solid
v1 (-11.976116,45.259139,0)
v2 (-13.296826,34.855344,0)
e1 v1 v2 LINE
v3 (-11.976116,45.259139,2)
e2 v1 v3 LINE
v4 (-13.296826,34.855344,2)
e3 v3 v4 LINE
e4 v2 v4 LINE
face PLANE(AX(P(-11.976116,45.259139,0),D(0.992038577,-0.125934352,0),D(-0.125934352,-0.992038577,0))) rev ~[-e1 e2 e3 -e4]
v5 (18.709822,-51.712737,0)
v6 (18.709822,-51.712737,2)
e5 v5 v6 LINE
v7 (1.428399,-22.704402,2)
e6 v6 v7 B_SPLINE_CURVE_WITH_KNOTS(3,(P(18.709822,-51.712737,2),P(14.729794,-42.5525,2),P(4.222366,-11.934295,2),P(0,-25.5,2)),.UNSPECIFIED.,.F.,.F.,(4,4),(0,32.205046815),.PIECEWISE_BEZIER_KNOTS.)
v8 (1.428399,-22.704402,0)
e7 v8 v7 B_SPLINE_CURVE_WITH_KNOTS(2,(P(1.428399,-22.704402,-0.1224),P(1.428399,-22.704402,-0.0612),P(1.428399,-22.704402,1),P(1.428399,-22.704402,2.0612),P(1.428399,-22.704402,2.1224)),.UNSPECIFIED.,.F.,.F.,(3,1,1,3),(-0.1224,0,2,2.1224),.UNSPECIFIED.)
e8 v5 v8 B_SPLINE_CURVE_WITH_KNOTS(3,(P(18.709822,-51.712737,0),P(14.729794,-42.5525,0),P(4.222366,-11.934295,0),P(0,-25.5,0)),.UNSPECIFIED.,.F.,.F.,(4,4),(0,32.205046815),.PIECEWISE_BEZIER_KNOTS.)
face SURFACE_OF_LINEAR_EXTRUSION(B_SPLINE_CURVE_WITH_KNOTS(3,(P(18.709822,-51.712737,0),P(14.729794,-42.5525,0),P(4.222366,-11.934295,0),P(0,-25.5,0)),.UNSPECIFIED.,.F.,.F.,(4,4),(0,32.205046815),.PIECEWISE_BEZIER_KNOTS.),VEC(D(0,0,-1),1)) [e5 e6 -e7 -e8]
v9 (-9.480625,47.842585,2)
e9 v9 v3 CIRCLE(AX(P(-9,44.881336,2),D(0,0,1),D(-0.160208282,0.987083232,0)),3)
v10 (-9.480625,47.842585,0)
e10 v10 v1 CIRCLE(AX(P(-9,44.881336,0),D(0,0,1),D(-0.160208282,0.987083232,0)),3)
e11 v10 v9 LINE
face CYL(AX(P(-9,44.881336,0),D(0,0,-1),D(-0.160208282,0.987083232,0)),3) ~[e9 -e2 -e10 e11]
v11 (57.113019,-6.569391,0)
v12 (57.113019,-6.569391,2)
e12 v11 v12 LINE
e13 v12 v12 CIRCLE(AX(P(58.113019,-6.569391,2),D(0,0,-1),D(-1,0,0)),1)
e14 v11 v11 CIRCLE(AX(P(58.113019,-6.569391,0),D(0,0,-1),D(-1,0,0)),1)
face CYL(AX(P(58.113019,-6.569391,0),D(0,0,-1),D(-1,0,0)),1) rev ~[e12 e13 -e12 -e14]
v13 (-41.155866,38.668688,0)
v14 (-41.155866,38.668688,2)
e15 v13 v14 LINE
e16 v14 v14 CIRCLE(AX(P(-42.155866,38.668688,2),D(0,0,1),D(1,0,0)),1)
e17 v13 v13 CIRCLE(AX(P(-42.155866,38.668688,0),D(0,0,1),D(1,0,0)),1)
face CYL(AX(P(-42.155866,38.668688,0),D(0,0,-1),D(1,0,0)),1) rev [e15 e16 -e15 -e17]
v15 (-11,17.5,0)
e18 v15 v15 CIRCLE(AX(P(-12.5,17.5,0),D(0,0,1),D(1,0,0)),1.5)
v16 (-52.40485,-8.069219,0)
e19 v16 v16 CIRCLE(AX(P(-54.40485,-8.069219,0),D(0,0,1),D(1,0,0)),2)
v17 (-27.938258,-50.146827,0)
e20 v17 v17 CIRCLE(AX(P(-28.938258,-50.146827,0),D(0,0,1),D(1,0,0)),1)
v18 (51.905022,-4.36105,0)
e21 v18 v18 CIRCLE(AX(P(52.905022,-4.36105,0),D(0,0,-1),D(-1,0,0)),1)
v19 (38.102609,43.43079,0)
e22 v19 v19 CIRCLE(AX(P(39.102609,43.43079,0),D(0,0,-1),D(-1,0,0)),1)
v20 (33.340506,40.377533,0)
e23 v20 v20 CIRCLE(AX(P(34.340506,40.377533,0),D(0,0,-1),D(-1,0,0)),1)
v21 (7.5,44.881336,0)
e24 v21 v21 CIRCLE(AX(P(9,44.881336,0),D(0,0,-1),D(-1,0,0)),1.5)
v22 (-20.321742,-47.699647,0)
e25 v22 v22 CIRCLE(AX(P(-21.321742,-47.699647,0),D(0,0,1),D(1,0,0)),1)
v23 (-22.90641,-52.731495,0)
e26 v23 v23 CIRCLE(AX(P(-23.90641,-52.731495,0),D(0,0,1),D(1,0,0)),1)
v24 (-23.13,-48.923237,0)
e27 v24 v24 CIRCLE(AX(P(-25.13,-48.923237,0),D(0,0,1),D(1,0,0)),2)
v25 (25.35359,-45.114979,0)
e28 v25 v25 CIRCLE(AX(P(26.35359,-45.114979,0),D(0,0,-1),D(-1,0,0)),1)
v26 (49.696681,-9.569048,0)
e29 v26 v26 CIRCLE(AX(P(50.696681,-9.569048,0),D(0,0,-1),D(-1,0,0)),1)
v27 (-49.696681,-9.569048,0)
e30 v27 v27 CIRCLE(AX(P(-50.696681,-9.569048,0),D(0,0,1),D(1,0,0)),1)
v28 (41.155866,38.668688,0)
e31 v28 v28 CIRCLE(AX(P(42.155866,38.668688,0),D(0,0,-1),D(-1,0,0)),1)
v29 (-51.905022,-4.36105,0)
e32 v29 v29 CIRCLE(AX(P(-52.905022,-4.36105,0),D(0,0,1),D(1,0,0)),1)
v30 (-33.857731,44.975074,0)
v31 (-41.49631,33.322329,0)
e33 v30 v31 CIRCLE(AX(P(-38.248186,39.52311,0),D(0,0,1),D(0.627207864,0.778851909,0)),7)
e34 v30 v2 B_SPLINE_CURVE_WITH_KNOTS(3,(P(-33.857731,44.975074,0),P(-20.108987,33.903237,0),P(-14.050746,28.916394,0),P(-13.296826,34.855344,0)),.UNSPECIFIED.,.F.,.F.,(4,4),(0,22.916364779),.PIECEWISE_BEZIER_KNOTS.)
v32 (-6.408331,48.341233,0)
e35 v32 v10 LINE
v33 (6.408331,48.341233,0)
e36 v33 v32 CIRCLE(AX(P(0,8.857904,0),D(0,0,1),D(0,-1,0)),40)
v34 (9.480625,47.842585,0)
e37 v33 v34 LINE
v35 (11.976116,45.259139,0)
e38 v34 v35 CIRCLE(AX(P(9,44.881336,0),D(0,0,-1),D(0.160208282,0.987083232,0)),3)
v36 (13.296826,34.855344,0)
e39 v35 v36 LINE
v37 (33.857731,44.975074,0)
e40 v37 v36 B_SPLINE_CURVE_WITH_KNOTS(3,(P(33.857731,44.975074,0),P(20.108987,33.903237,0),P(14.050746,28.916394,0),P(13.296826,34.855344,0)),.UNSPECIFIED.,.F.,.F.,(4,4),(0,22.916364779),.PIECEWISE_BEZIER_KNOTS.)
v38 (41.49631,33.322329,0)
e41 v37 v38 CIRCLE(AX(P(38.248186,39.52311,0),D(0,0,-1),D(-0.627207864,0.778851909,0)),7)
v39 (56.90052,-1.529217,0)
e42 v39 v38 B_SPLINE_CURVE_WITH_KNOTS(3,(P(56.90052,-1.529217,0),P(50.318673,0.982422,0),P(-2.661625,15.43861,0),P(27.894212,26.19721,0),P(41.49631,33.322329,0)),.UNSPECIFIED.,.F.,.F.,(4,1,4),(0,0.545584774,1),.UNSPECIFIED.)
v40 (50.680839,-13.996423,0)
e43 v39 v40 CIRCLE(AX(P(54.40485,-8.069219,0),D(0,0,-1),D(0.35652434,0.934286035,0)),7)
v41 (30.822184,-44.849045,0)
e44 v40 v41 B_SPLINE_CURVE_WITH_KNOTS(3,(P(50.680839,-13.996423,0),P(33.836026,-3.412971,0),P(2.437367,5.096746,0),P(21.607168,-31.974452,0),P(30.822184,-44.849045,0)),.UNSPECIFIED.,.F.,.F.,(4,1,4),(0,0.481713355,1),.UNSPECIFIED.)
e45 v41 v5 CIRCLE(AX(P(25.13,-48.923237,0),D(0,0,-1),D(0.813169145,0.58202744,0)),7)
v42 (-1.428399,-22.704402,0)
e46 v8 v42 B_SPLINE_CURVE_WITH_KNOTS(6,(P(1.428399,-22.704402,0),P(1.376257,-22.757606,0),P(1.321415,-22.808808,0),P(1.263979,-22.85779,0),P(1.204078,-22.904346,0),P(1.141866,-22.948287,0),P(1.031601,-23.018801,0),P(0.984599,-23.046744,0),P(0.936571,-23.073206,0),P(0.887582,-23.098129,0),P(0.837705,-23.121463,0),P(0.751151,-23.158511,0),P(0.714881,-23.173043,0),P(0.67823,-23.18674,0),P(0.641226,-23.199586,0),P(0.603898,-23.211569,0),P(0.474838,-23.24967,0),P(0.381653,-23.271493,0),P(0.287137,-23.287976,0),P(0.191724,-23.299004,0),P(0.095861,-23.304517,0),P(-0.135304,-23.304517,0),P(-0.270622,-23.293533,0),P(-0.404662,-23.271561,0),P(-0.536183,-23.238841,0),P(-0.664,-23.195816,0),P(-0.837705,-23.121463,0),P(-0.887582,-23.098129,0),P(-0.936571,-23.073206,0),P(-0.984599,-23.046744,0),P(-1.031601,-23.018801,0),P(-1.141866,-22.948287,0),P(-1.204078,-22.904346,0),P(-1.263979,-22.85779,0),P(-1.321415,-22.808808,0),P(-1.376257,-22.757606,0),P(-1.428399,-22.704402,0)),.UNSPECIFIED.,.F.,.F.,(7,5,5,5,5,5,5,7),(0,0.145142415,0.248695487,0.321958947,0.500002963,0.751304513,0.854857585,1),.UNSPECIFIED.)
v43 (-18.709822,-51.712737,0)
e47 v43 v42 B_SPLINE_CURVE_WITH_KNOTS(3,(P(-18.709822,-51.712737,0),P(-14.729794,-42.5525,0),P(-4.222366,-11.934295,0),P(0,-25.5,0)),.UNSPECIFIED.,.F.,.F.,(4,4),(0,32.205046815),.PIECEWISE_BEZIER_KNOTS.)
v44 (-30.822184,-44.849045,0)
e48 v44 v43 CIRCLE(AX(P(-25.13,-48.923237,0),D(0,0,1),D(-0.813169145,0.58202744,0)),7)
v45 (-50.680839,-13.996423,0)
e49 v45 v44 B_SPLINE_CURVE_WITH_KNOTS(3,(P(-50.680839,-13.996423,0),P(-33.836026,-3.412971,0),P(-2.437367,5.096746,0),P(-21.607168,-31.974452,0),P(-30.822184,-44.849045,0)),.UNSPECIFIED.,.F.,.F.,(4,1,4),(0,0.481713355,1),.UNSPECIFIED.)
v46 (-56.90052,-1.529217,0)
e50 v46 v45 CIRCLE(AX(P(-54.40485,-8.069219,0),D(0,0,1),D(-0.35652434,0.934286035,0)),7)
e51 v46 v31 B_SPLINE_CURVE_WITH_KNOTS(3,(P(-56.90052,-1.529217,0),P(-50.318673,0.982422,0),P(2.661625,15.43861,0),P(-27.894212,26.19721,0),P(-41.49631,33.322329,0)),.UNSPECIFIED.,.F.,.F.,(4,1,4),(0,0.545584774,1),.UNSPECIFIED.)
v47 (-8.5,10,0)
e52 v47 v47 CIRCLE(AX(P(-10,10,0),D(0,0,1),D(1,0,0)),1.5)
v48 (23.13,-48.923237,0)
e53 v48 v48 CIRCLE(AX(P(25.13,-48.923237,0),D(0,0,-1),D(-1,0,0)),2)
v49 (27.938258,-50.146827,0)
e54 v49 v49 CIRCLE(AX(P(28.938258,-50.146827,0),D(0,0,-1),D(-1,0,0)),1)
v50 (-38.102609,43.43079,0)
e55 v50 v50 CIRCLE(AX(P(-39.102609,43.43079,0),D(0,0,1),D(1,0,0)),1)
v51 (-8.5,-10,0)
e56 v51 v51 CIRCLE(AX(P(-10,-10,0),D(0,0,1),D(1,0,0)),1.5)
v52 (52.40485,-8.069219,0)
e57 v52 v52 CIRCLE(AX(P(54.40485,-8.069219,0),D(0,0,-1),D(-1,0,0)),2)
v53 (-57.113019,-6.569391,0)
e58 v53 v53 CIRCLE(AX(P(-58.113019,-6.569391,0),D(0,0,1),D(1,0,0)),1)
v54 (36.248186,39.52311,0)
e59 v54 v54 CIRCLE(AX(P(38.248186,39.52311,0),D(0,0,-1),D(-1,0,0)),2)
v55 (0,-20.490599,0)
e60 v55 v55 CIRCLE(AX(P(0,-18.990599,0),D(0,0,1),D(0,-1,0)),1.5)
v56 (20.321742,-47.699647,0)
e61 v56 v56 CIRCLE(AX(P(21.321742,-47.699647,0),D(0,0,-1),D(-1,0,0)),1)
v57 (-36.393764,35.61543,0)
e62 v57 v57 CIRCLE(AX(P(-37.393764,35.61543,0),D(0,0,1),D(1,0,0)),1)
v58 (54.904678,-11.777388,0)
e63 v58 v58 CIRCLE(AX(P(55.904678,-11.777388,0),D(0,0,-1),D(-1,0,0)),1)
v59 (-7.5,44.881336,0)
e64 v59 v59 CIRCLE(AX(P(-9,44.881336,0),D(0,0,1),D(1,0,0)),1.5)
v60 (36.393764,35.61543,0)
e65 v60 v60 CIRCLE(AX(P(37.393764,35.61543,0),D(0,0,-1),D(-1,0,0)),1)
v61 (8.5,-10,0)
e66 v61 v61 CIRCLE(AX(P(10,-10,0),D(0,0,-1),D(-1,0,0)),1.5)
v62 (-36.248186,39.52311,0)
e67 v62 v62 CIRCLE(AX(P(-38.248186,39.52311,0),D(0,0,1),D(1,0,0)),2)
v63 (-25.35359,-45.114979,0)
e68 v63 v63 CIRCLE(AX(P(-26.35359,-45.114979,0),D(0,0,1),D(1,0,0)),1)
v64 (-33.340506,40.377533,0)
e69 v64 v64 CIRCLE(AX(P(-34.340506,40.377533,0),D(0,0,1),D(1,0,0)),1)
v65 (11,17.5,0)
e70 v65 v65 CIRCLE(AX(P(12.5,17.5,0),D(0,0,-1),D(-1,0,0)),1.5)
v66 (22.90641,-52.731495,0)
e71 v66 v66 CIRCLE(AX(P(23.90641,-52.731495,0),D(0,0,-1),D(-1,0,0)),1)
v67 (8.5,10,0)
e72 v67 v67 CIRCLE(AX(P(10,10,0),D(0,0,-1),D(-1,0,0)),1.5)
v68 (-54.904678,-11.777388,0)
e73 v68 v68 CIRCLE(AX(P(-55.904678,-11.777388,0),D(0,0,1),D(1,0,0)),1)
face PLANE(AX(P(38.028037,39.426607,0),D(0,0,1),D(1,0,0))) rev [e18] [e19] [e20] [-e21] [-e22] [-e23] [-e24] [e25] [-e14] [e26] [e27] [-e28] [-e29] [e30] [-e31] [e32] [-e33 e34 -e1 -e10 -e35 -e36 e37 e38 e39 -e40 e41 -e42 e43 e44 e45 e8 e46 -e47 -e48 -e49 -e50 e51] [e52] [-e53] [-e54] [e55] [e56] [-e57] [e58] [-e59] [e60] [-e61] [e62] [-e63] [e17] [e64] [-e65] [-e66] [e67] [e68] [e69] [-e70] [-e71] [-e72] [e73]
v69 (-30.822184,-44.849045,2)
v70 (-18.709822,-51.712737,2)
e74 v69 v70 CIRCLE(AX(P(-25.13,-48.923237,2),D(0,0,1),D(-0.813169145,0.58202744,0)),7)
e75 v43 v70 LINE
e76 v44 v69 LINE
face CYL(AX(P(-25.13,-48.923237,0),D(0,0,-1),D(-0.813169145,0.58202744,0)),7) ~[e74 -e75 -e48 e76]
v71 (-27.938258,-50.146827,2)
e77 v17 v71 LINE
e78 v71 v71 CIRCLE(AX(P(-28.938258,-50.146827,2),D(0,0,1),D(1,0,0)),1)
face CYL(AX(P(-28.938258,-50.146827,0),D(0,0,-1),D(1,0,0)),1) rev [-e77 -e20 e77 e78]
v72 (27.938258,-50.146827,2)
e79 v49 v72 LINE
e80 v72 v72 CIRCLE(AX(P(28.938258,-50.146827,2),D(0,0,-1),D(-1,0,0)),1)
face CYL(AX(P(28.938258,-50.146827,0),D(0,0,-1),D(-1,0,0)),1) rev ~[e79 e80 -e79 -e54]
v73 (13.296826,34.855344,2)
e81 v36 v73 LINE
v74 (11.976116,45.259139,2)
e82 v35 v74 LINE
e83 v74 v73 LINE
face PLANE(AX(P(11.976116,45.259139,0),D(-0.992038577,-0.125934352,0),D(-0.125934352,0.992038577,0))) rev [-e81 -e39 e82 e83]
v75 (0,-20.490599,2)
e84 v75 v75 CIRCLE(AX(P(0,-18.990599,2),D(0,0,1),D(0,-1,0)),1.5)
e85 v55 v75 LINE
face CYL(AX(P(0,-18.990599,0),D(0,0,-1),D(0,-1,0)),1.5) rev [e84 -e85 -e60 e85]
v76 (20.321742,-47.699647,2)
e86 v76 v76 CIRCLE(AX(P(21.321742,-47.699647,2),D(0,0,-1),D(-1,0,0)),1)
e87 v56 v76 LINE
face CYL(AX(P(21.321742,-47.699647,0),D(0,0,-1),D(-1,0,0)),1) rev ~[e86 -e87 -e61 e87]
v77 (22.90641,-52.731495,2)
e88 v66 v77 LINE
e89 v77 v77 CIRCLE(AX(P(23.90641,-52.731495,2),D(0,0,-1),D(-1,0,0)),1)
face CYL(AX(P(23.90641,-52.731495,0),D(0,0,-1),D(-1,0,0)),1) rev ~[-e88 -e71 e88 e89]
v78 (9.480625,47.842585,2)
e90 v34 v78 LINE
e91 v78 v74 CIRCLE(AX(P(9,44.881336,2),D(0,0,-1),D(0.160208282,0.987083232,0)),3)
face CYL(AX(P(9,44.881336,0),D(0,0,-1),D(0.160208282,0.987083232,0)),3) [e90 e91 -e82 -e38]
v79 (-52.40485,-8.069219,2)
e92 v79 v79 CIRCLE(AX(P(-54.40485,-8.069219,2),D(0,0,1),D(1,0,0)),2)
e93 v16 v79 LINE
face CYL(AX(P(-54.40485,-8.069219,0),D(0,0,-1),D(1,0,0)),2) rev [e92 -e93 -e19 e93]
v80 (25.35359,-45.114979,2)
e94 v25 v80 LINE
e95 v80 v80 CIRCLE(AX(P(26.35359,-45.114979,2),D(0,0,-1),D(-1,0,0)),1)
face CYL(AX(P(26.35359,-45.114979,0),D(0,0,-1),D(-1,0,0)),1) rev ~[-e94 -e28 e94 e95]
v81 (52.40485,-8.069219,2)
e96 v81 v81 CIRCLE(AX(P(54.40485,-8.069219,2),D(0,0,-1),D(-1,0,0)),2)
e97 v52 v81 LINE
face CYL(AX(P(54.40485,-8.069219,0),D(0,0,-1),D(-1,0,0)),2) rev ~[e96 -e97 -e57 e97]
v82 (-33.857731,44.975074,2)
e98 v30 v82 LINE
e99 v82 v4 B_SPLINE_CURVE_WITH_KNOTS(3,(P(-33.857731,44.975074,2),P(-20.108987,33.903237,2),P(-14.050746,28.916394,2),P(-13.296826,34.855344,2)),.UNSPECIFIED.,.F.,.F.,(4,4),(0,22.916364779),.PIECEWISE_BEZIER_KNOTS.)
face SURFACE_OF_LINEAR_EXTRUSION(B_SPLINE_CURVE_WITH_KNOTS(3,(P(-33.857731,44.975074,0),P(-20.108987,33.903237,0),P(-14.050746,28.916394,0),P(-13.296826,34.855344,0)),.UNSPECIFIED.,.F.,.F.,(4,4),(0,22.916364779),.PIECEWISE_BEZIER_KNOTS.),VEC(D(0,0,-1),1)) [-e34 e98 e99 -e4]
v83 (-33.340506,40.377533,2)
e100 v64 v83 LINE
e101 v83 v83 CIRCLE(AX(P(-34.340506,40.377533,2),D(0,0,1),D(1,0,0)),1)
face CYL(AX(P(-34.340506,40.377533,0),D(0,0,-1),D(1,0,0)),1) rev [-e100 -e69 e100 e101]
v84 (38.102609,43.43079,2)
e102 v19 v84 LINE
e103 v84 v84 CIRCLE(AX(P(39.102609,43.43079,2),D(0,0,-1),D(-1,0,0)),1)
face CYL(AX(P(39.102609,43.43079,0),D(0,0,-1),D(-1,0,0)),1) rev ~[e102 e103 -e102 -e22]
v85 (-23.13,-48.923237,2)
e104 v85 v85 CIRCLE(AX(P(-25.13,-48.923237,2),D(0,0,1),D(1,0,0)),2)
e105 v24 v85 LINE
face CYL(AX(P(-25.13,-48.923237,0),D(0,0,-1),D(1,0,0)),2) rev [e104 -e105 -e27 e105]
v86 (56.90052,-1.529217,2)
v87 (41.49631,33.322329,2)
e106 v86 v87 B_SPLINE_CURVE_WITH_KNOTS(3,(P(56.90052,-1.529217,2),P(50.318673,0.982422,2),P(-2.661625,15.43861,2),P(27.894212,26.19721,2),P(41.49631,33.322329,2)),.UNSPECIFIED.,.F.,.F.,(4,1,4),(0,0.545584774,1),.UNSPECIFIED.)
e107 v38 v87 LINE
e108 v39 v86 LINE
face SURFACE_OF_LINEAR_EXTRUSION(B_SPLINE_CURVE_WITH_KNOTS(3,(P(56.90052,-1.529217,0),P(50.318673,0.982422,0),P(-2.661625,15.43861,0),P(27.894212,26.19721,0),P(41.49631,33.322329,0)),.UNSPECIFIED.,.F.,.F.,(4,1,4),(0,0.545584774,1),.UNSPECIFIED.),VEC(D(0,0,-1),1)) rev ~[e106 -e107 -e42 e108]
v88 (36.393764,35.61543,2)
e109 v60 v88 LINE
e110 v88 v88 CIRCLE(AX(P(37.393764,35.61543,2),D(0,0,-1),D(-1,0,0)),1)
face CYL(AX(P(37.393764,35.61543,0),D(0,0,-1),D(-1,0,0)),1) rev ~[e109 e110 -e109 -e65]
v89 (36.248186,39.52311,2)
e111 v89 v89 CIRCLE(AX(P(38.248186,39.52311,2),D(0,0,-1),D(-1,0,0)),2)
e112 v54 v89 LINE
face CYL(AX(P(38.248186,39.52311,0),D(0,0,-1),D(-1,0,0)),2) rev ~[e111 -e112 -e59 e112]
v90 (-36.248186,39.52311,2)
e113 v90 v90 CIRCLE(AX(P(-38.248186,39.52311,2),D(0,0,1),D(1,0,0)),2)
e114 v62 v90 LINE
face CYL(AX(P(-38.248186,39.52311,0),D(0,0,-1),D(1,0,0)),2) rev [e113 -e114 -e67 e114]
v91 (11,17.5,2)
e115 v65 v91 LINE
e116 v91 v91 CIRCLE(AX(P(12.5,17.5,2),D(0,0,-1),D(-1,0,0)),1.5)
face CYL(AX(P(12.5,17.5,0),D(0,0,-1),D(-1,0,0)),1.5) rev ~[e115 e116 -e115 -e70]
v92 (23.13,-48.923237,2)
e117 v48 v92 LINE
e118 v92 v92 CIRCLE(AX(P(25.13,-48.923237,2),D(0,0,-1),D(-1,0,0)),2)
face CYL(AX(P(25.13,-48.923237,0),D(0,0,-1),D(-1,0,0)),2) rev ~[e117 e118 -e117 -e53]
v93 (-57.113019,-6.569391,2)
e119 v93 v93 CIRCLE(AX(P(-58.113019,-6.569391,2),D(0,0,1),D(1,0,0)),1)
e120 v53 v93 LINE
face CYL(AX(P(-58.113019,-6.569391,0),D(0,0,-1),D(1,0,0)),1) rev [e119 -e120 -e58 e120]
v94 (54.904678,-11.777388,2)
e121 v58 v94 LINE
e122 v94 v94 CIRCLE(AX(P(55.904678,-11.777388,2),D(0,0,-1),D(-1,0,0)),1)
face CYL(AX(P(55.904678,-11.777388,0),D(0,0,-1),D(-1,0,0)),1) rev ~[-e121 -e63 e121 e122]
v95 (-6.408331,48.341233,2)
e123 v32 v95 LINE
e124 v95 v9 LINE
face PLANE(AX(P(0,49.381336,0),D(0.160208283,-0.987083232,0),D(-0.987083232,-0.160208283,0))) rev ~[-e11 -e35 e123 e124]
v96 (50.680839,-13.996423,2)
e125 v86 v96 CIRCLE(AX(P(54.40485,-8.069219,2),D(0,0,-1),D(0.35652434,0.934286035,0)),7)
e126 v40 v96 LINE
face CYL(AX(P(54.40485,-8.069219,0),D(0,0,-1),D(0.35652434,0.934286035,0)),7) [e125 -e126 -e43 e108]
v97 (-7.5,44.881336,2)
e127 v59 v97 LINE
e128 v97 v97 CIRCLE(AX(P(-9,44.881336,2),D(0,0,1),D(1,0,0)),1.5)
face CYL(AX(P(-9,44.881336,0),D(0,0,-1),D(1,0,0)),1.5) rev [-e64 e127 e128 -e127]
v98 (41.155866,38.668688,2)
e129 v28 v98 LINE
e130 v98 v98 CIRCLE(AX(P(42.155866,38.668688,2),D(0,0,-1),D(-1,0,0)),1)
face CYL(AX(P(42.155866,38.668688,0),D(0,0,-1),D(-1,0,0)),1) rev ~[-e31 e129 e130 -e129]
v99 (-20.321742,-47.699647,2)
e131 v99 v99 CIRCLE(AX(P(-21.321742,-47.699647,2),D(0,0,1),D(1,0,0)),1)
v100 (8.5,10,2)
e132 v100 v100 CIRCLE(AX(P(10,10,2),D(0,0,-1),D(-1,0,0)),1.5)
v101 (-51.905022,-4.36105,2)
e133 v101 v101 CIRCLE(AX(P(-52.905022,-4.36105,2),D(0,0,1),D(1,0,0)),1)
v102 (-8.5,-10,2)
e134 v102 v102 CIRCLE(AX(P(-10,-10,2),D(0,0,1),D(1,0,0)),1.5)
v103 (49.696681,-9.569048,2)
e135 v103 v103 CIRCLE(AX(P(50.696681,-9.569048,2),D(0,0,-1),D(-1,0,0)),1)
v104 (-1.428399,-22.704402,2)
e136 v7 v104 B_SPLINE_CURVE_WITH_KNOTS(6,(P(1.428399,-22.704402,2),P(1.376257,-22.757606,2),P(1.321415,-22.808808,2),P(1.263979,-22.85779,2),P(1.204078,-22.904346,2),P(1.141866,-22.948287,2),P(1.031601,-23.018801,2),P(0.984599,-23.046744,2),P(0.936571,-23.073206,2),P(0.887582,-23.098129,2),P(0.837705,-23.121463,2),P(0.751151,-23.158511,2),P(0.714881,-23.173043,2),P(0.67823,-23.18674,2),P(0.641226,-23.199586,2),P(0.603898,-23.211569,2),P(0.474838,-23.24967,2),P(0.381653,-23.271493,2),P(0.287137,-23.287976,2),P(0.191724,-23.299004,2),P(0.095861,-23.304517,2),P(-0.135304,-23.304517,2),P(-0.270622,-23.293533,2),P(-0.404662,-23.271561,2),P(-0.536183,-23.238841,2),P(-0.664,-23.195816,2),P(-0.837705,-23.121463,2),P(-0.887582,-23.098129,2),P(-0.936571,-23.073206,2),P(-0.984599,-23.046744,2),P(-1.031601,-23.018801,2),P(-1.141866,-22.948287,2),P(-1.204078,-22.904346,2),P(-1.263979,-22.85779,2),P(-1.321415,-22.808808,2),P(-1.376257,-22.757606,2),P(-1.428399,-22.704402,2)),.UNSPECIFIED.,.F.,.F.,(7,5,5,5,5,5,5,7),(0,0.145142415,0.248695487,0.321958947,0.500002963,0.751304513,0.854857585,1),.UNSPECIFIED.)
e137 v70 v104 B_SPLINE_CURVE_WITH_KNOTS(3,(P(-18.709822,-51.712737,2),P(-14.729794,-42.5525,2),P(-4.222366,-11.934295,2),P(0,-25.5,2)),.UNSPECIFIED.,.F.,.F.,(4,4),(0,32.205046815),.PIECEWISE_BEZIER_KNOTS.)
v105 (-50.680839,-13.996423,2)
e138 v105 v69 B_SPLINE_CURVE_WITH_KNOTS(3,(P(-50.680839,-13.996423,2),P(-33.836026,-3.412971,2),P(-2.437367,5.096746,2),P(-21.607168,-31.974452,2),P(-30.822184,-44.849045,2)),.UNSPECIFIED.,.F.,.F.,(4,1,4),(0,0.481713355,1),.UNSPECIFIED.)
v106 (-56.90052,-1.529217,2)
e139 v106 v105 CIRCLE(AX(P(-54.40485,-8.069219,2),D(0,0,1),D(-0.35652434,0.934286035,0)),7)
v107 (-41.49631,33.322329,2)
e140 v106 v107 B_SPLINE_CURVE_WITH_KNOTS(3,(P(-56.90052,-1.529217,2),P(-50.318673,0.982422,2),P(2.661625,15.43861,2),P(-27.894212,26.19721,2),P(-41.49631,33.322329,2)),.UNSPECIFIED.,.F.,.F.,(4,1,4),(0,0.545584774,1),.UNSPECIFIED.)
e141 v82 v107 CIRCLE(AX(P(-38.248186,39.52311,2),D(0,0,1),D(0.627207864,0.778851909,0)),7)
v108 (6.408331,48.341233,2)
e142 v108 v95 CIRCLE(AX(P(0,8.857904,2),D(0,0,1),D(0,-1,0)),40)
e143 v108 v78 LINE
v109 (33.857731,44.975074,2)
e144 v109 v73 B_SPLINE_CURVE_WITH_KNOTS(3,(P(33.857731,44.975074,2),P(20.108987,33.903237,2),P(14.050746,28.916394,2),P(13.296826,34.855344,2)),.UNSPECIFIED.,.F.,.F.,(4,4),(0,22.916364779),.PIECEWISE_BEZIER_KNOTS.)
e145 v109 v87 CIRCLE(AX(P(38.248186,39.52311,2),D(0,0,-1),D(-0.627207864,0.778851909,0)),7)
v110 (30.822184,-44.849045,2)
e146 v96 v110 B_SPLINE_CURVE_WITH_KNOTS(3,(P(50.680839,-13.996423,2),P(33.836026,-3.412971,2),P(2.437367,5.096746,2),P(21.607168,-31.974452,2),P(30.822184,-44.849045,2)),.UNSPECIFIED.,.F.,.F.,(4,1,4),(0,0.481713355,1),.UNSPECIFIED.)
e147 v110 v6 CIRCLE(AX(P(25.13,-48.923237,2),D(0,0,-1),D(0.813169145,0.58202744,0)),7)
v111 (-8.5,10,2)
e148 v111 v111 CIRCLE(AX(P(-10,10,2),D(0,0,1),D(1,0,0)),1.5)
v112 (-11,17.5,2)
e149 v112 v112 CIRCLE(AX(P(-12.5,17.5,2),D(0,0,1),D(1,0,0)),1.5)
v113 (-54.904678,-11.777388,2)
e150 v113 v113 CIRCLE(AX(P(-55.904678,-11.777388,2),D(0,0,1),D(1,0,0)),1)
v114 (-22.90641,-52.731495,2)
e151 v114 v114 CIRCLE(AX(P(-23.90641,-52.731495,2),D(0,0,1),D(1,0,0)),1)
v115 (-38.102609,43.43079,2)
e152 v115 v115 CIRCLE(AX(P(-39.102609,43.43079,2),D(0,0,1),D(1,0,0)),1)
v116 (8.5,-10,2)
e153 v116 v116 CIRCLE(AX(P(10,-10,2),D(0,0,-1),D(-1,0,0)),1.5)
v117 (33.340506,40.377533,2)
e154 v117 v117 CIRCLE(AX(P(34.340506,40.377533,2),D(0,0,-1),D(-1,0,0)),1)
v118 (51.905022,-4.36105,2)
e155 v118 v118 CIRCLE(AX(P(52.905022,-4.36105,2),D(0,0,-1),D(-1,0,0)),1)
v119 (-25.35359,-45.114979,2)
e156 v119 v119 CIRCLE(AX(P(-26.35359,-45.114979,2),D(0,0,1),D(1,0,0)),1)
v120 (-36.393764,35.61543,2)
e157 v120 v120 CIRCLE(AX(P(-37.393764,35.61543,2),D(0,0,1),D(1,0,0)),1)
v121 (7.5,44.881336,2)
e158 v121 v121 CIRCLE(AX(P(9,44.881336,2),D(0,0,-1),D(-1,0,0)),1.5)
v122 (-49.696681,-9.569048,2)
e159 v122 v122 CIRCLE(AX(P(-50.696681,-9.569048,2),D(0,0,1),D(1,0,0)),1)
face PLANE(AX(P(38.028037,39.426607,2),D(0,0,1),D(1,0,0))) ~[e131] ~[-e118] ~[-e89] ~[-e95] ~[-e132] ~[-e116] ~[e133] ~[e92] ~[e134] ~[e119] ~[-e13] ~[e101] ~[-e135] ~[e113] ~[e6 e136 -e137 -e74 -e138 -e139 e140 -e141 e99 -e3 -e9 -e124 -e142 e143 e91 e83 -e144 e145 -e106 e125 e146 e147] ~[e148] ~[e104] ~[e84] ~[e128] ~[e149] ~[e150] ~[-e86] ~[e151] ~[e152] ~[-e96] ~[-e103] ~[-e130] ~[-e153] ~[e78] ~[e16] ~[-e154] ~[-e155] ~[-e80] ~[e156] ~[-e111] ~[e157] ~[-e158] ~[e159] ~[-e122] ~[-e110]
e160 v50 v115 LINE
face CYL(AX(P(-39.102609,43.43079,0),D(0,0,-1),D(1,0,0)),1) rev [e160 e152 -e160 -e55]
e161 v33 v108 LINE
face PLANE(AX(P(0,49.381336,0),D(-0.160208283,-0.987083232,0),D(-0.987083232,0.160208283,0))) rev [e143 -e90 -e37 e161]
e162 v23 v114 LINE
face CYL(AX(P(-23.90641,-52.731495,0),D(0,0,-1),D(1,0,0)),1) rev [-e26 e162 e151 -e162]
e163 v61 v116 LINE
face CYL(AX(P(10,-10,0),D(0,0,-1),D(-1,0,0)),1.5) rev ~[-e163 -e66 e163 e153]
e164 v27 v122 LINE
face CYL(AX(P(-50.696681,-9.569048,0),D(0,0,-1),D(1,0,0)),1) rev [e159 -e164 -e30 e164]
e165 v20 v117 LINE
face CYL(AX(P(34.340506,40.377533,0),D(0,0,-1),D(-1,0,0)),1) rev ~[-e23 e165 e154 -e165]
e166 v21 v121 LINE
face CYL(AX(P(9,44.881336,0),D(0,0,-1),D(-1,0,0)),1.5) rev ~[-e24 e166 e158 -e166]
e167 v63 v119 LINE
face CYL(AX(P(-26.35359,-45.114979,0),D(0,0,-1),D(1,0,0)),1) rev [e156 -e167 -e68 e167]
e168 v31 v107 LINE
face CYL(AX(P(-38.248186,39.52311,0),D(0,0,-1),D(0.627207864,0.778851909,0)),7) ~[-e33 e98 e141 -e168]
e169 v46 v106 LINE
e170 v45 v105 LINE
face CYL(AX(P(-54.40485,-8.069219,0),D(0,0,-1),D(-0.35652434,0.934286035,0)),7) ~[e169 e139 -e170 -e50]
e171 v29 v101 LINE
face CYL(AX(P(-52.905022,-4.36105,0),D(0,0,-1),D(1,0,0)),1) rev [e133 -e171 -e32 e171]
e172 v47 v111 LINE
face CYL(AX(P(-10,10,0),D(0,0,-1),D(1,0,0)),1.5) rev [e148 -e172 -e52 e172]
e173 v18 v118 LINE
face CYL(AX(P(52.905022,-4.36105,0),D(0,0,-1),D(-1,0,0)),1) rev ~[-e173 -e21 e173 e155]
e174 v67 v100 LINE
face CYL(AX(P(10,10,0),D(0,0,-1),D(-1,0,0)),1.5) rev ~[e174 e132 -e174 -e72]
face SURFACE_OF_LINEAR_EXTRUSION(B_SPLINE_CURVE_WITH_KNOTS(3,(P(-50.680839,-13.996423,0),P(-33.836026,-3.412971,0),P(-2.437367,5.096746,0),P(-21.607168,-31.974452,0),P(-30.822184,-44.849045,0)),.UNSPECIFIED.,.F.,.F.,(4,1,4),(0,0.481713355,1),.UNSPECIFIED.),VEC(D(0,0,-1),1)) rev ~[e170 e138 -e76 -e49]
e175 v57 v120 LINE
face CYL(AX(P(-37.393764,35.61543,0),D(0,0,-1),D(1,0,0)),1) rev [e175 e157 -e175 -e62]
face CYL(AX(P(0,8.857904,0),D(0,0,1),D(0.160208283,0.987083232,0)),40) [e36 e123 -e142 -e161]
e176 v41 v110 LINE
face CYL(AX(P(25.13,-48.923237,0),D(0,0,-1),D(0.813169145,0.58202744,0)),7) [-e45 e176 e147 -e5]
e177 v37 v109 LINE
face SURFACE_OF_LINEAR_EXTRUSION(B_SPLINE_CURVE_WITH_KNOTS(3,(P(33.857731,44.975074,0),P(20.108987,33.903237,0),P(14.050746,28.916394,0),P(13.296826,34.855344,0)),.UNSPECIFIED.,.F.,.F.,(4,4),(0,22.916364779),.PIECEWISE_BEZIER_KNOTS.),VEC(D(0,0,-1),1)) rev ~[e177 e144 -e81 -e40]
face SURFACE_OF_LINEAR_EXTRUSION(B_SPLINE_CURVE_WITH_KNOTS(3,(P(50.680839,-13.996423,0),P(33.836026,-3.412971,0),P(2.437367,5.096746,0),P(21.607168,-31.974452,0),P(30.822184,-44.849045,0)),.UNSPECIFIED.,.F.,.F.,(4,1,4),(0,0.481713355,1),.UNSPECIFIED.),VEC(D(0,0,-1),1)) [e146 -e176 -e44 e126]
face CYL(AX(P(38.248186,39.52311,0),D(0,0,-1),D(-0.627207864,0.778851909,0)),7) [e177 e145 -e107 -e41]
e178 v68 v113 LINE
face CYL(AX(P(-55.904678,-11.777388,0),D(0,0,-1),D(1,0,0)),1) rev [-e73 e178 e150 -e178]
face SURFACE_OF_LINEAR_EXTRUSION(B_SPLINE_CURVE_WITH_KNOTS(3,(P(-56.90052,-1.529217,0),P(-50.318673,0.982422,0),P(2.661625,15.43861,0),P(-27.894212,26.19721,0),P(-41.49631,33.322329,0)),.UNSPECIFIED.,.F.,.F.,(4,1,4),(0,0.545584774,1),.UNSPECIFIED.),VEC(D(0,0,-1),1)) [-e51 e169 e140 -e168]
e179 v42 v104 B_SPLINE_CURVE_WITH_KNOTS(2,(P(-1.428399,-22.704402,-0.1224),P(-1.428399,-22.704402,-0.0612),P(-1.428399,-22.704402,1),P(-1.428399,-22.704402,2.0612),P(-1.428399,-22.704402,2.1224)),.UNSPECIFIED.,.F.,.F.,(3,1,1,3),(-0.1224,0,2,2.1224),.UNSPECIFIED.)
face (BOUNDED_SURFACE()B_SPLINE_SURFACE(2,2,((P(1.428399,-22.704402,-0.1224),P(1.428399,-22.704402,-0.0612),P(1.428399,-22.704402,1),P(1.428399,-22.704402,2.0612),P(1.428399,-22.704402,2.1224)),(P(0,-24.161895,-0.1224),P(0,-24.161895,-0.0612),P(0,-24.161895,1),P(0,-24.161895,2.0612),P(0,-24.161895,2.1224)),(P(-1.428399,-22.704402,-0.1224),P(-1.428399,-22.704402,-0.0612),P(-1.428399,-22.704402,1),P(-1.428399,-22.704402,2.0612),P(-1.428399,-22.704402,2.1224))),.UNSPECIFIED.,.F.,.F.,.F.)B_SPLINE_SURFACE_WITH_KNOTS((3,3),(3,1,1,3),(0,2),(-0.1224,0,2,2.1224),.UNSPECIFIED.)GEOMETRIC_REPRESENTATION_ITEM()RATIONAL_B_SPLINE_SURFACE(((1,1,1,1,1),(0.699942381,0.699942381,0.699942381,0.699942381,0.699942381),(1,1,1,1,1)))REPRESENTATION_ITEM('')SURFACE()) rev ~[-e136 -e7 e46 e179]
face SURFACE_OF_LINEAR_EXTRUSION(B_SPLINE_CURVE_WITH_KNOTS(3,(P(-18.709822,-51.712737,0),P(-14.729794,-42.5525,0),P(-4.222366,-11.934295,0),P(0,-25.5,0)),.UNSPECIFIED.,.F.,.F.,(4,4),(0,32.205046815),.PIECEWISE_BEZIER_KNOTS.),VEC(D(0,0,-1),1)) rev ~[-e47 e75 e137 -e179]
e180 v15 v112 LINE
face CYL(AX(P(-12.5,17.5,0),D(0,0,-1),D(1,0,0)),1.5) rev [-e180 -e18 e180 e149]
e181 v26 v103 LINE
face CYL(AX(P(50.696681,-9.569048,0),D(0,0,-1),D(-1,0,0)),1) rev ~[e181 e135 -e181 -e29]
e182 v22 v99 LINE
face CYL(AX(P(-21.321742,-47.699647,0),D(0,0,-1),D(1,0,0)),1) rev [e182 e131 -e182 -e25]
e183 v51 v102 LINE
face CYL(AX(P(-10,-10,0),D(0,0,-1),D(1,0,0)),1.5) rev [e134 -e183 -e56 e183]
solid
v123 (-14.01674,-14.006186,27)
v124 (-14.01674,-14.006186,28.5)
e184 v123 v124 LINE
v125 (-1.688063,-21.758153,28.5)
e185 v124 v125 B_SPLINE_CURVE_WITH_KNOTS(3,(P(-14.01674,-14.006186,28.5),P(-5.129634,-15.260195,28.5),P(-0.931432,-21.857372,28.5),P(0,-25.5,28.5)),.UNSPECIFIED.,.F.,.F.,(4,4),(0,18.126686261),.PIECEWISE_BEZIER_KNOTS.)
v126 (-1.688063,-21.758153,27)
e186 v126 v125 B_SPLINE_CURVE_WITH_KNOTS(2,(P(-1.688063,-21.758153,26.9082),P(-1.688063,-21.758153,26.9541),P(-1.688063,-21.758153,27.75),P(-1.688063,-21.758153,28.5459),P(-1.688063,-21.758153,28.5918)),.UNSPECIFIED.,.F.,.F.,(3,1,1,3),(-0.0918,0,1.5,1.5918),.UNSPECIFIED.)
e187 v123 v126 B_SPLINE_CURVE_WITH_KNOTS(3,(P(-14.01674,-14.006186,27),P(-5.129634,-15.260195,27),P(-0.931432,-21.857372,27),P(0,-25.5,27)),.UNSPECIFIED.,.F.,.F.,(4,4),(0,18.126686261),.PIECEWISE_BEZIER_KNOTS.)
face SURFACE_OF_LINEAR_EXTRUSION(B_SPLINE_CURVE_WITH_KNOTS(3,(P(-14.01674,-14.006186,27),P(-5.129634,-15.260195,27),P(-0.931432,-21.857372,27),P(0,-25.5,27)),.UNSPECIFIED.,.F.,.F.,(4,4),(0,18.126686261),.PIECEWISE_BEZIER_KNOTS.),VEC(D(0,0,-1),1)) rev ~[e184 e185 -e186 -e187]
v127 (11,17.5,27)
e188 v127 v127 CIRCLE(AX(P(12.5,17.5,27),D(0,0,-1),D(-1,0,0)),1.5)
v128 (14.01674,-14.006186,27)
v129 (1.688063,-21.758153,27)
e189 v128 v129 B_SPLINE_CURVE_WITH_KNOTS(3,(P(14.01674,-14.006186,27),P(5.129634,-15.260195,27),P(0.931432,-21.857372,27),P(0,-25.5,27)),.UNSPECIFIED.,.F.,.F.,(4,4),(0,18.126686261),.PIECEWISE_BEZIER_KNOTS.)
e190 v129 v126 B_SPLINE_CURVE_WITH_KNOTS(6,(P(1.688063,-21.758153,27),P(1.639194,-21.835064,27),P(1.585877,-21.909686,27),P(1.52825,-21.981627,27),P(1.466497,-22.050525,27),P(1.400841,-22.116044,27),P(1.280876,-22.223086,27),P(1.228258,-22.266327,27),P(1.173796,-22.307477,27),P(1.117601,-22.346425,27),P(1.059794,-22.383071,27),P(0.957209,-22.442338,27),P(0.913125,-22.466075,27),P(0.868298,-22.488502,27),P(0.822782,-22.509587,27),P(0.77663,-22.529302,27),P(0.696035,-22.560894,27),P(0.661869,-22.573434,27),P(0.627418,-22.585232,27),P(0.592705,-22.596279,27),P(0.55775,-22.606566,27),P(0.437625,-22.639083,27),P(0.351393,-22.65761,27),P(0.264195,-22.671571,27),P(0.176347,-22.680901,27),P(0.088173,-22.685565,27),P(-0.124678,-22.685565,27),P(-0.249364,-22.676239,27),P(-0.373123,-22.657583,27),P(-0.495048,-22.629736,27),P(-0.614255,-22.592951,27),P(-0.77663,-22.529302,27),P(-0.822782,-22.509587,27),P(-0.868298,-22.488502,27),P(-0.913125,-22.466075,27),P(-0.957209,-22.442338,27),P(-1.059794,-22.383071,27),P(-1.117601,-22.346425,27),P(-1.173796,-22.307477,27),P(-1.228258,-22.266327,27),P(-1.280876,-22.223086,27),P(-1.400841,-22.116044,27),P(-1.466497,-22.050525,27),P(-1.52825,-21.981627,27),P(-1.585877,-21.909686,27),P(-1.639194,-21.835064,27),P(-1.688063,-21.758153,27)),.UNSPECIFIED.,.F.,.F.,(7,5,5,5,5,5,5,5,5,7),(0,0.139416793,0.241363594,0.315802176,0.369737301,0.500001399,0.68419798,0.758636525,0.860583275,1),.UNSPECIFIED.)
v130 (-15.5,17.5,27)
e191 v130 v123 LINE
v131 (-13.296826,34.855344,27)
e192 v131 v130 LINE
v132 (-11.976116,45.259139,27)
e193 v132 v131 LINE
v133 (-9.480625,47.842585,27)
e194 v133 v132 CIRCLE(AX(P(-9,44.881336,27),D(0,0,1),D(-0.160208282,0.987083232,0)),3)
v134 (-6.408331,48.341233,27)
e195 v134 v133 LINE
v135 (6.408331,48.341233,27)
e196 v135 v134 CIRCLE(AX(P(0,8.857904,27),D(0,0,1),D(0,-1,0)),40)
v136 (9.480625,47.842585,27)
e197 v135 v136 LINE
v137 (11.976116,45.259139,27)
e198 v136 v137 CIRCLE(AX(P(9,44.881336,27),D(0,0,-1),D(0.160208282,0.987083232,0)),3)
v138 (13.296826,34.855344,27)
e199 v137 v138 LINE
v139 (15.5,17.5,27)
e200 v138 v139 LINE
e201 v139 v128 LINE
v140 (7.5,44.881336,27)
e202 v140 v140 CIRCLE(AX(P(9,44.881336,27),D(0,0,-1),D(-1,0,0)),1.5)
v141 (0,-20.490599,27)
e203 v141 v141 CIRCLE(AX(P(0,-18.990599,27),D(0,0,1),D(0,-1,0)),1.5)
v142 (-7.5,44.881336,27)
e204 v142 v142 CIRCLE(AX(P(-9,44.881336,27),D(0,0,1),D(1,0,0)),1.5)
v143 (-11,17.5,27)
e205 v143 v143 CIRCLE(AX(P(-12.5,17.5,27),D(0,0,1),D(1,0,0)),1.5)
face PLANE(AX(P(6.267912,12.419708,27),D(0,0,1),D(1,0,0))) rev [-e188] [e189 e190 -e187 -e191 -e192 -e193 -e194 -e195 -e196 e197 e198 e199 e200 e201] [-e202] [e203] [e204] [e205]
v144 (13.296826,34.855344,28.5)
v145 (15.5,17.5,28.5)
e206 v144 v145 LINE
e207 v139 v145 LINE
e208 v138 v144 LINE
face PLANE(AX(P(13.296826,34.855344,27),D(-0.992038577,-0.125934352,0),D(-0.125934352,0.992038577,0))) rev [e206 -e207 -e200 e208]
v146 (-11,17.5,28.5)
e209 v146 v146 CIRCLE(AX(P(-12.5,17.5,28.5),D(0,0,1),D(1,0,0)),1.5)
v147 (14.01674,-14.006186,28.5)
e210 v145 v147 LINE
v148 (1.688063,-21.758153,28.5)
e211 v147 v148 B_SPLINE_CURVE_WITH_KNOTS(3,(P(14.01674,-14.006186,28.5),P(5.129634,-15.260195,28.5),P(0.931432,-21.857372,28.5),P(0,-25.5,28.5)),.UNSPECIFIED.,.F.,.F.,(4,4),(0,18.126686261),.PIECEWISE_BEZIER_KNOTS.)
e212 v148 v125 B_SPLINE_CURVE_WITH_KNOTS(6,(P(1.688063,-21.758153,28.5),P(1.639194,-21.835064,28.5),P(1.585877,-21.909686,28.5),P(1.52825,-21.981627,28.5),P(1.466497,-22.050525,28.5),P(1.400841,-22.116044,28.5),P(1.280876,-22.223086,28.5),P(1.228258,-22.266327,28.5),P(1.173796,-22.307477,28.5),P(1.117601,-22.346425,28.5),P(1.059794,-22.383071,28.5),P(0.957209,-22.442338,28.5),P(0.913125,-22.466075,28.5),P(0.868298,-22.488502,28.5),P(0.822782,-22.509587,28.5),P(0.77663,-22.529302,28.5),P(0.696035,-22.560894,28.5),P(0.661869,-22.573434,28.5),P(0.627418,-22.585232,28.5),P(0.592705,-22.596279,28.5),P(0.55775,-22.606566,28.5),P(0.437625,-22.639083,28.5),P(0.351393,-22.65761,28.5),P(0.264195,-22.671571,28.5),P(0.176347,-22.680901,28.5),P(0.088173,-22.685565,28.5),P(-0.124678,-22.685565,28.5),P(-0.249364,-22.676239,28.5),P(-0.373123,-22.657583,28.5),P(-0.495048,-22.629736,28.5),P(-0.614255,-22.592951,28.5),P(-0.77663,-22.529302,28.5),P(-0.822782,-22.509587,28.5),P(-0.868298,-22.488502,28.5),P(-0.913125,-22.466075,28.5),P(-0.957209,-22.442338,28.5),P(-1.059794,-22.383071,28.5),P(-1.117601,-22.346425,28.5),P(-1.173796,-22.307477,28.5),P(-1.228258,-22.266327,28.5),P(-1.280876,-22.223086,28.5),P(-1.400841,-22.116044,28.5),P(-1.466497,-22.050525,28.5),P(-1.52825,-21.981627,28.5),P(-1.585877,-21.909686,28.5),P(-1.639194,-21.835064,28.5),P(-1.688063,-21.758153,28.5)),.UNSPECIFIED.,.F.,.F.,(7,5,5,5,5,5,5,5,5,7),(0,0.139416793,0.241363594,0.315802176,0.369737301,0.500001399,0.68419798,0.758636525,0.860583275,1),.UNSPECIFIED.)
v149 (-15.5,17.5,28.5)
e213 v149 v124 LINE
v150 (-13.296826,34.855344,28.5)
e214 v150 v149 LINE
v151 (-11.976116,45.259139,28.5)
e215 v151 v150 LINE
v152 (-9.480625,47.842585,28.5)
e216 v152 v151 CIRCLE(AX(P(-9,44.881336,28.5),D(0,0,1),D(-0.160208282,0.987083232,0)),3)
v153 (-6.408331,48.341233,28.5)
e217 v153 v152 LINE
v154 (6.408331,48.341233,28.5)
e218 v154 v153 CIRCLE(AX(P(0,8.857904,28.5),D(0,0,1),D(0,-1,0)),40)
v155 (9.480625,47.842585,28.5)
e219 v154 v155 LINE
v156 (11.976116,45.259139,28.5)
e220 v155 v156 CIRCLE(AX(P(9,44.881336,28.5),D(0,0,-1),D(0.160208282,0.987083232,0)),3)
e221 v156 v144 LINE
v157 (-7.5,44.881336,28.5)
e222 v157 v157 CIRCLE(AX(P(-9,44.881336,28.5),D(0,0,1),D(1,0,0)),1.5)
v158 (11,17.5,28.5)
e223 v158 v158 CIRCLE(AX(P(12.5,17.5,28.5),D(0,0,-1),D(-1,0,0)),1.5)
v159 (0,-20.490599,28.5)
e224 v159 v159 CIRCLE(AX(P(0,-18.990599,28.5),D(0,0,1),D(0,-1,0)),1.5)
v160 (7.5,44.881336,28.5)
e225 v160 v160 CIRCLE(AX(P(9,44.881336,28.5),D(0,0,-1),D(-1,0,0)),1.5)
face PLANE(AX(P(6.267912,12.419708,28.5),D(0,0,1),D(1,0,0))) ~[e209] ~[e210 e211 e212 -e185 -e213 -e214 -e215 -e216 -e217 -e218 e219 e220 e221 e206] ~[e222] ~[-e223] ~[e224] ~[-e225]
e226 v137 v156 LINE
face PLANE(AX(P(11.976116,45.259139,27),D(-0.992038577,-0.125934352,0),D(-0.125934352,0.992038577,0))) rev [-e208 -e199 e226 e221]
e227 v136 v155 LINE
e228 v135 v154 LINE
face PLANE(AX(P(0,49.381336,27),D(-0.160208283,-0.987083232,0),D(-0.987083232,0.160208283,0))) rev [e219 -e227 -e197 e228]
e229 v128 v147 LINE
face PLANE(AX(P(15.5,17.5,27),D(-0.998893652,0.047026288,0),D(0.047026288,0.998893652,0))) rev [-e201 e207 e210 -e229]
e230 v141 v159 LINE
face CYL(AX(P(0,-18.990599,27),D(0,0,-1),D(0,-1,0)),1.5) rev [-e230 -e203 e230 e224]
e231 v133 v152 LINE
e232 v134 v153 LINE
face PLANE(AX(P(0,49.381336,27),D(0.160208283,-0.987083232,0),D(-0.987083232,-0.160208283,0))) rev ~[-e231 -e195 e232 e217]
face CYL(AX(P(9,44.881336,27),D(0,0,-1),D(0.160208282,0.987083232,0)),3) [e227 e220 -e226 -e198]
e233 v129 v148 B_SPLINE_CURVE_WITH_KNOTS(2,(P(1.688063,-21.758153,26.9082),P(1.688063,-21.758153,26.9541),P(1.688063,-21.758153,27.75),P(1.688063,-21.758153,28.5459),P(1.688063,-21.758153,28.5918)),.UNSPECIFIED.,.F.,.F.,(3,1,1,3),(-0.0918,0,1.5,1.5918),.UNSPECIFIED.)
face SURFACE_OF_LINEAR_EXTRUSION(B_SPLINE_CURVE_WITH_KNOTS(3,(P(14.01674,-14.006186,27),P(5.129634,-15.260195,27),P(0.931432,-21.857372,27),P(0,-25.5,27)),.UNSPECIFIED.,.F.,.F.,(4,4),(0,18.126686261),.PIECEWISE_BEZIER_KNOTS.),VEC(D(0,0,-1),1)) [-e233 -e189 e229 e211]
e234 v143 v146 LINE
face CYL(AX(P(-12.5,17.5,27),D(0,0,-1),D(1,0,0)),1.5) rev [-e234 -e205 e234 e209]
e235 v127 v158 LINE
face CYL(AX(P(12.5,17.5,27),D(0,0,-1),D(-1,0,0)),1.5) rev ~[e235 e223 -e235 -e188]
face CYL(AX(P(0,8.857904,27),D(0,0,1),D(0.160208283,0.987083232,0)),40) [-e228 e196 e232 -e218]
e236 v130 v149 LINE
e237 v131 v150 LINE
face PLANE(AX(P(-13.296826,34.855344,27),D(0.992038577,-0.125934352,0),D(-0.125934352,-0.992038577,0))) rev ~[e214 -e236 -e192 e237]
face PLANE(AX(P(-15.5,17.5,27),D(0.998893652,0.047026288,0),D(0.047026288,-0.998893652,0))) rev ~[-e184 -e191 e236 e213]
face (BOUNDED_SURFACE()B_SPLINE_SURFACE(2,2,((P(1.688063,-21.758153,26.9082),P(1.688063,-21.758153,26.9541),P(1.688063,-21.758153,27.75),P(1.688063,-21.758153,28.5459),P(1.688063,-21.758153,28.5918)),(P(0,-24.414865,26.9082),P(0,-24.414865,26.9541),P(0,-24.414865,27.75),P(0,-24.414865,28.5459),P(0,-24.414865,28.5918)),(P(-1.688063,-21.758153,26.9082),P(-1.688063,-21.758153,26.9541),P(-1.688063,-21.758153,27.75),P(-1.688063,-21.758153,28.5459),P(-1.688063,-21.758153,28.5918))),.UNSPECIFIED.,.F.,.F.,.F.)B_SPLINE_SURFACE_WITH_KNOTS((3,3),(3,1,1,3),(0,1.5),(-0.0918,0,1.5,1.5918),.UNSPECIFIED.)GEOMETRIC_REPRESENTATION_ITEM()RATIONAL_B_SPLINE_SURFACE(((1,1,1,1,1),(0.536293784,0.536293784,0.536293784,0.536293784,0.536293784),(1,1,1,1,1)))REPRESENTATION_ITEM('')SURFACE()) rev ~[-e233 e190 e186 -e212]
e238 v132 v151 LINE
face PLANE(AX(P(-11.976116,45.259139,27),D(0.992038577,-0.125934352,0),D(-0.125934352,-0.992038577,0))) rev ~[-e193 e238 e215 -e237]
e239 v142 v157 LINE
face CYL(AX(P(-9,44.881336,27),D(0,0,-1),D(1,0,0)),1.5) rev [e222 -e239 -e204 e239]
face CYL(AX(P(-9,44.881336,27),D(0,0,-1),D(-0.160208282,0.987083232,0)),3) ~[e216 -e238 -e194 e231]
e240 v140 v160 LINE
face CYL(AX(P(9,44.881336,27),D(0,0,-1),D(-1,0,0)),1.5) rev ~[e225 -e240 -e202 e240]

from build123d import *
from build123d import SkipClean  # not in build123d's __all__

# Parameters (mm, degrees)
F0_R     = 1
F0_R_2   = 2
F0_R_3   = 1.5
F1_DEPTH = 2
F3_START = 27
F3_DEPTH = 1.5
F5_R     = 2
F5_2_R   = 2
F6_R     = 40
F6_2_R   = 40


with BuildPart() as f1:
    # F0 (on Top) → F1 (new body)
    with BuildSketch(Plane.XY):
        with BuildLine():
            ThreePointArc((-41.4963104591, 33.3223288889), (-34.6244361147, 33.5340840773), (-31.24818631, 39.523110252))
            ThreePointArc((-31.24818631, 39.523110252), (-31.9341865743, 42.5452630174), (-33.8577312636, 44.9750736126))
            ThreePointArc((-33.8577312636, 44.9750736126), (-44.1024877089, 43.3607078249), (-41.4963104591, 33.3223288889))
        make_face()
        with Locations((-37.3937638756, 35.6154303389)):
            Circle(F0_R, mode=Mode.SUBTRACT)
        with Locations((-42.1558662232, 38.6686878176)):
            Circle(F0_R, mode=Mode.SUBTRACT)
        with Locations((-38.24818631, 39.523110252)):
            Circle(F0_R_2, mode=Mode.SUBTRACT)
        with Locations((-39.1026087444, 43.4307901652)):
            Circle(F0_R, mode=Mode.SUBTRACT)
        with Locations((-34.3405063969, 40.3775326864)):
            Circle(F0_R, mode=Mode.SUBTRACT)
        with BuildLine():
            ThreePointArc((-47.4048499874, -8.0692191595), (-50.4343142983, -2.3042520008), (-56.9005203707, -1.5292169166))
            ThreePointArc((-56.9005203707, -1.5292169166), (-60.6686355635, -11.194117599), (-50.6808388136, -13.9964226129))
            ThreePointArc((-50.6808388136, -13.9964226129), (-48.2783469793, -11.455361639), (-47.4048499874, -8.0692191595))
        make_face()
        with Locations((-55.9046783302, -11.7773878372)):
            Circle(F0_R, mode=Mode.SUBTRACT)
        with Locations((-58.1130186652, -6.5693908168)):
            Circle(F0_R, mode=Mode.SUBTRACT)
        with Locations((-54.4048499874, -8.0692191595)):
            Circle(F0_R_2, mode=Mode.SUBTRACT)
        with Locations((-50.6966813097, -9.5690475022)):
            Circle(F0_R, mode=Mode.SUBTRACT)
        with Locations((-52.9050216447, -4.3610504818)):
            Circle(F0_R, mode=Mode.SUBTRACT)
        with BuildLine():
            ThreePointArc((-18.13, -48.9232368103), (-22.990524377, -42.2582053731), (-30.8221840168, -44.8490447286))
            ThreePointArc((-30.8221840168, -44.8490447286), (-28.5810959404, -55.0133876139), (-18.7098219402, -51.7127374251))
            ThreePointArc((-18.7098219402, -51.7127374251), (-18.2764882571, -50.3477987748), (-18.13, -48.9232368103))
        make_face()
        with Locations((-28.9382578849, -50.1468265627)):
            Circle(F0_R, mode=Mode.SUBTRACT)
        with Locations((-23.9064102476, -52.7314946952)):
            Circle(F0_R, mode=Mode.SUBTRACT)
        with Locations((-26.3535897524, -45.1149789254)):
            Circle(F0_R, mode=Mode.SUBTRACT)
        with Locations((-25.13, -48.9232368103)):
            Circle(F0_R_2, mode=Mode.SUBTRACT)
        with Locations((-21.3217421151, -47.699647058)):
            Circle(F0_R, mode=Mode.SUBTRACT)
        with BuildLine():
            ThreePointArc((-33.8577312636, 44.9750736126), (-31.9341865743, 42.5452630174), (-31.24818631, 39.523110252))
            ThreePointArc((-31.24818631, 39.523110252), (-34.6244361147, 33.5340840773), (-41.4963104591, 33.3223288889))
            add(Edge.make_bspline(
                [(-56.9005203707, -1.5292169166), (-50.3186728015, 0.9824216786), (2.6616248501, 15.4386103021), (-27.894211933, 26.1972099543), (-41.4963104591, 33.3223288889)],
                knots=[0, 0, 0, 0, 0.5455847742, 1, 1, 1, 1], degree=3))
            ThreePointArc((-56.9005203707, -1.5292169166), (-50.4343142983, -2.3042520008), (-47.4048499874, -8.0692191595))
            ThreePointArc((-47.4048499874, -8.0692191595), (-48.2783469793, -11.455361639), (-50.6808388136, -13.9964226129))
            add(Edge.make_bspline(
                [(-50.6808388136, -13.9964226129), (-33.8360257447, -3.4129708074), (-2.4373665833, 5.0967457749), (-21.6071682121, -31.974451527), (-30.8221840168, -44.8490447286)],
                knots=[0, 0, 0, 0, 0.481713355, 1, 1, 1, 1], degree=3))
            ThreePointArc((-30.8221840168, -44.8490447286), (-22.990524377, -42.2582053731), (-18.13, -48.9232368103))
            ThreePointArc((-18.13, -48.9232368103), (-18.2764882571, -50.3477987748), (-18.7098219402, -51.7127374251))
            add(Edge.make_bspline(
                [(-18.7098219402, -51.7127374251), (-14.7297938944, -42.5524997105), (-4.2223660275, -11.9342948571), (0, -25.5)],
                knots=[0, 0, 0, 0, 32.2050468149, 32.2050468149, 32.2050468149, 32.2050468149], degree=3))
            add(Edge.make_bspline(
                [(-14.0167400241, -14.0061862767), (-5.1296344027, -15.2601953596), (-0.9314316558, -21.8573715538), (0, -25.5)],
                knots=[0, 0, 0, 0, 18.1266862611, 18.1266862611, 18.1266862611, 18.1266862611], degree=3))
            Line((-14.0167400241, -14.0061862767), (-15.5, 17.5))
            Line((-15.5, 17.5), (-13.2968256499, 34.8553436253))
            add(Edge.make_bspline(
                [(-33.8577312636, 44.9750736126), (-20.1089866459, 33.9032374322), (-14.0507456444, 28.9163944135), (-13.2968256499, 34.8553436253)],
                knots=[0, 0, 0, 0, 22.9163647786, 22.9163647786, 22.9163647786, 22.9163647786], degree=3))
        make_face()
        with BuildLine():
            Line((-11.9761157322, 45.2591386998), (-13.2968256499, 34.8553436253))
            Line((-13.2968256499, 34.8553436253), (-15.5, 17.5))
            Line((-15.5, 17.5), (-14.0167400241, -14.0061862767))
            add(Edge.make_bspline(
                [(-14.0167400241, -14.0061862767), (-5.1296344027, -15.2601953596), (-0.9314316558, -21.8573715538), (0, -25.5)],
                knots=[0, 0, 0, 0, 18.1266862611, 18.1266862611, 18.1266862611, 18.1266862611], degree=3))
            Line((0, -25.5), (0, -20.490599284))
            ThreePointArc((0, -20.490599284), (-1.5, -18.990599284), (0, -17.490599284))
            Line((0, -17.490599284), (0, 49.3813356447))
            Line((0, 49.3813356447), (-9.4806248475, 47.8425853396))
            ThreePointArc((-9.4806248475, 47.8425853396), (-11.1577333, 46.9656069816), (-11.9761157322, 45.2591386998))
        make_face()
        with Locations((-10, -10)):
            Circle(F0_R_3, mode=Mode.SUBTRACT)
        with Locations((-10, 10)):
            Circle(F0_R_3, mode=Mode.SUBTRACT)
        with Locations((-12.5, 17.5)):
            Circle(F0_R_3, mode=Mode.SUBTRACT)
        with Locations((-9, 44.8813356447)):
            Circle(F0_R_3, mode=Mode.SUBTRACT)
    extrude(amount=F1_DEPTH)

    # F2: F1 across face


with BuildPart() as f1_1:
    add(f1.part, clean=False)
    with SkipClean():  # cleaning this boolean's faces spoils the solid; the shape is the same uncleaned
        add(f1.part.mirror(Plane(origin=(0, 15.9453681803, 1), x_dir=(0, 1, 0), z_dir=(1, 0, 0))), clean=False)

    # F5
    f5_edges = [f1_1.edges().sort_by_distance(p)[0] for p in [
        (0, -25.5, 1),
    ]]
    fillet(f5_edges, radius=F5_R)

    # F6
    f6_edges = [f1_1.edges().sort_by_distance(p)[0] for p in [
        (0, 49.381336, 1),
    ]]
    fillet(f6_edges, radius=F6_R)


with BuildPart() as f3:
    # F0 (on Top) → F3 (new body)
    with BuildSketch(Plane.XY.offset(F3_START)):
        with BuildLine():
            Line((-11.9761157322, 45.2591386998), (-13.2968256499, 34.8553436253))
            Line((-13.2968256499, 34.8553436253), (-15.5, 17.5))
            Line((-15.5, 17.5), (-14.0167400241, -14.0061862767))
            add(Edge.make_bspline(
                [(-14.0167400241, -14.0061862767), (-5.1296344027, -15.2601953596), (-0.9314316558, -21.8573715538), (0, -25.5)],
                knots=[0, 0, 0, 0, 18.1266862611, 18.1266862611, 18.1266862611, 18.1266862611], degree=3))
            Line((0, -25.5), (0, -20.490599284))
            ThreePointArc((0, -20.490599284), (-1.5, -18.990599284), (0, -17.490599284))
            Line((0, -17.490599284), (0, 49.3813356447))
            Line((0, 49.3813356447), (-9.4806248475, 47.8425853396))
            ThreePointArc((-9.4806248475, 47.8425853396), (-11.1577333, 46.9656069816), (-11.9761157322, 45.2591386998))
        make_face()
        with Locations((-10, -10)):
            Circle(F0_R_3, mode=Mode.SUBTRACT)
        with Locations((-10, 10)):
            Circle(F0_R_3, mode=Mode.SUBTRACT)
        with Locations((-12.5, 17.5)):
            Circle(F0_R_3, mode=Mode.SUBTRACT)
        with Locations((-9, 44.8813356447)):
            Circle(F0_R_3, mode=Mode.SUBTRACT)
        with Locations((-10, -10)):
            Circle(F0_R_3)
        with Locations((-10, 10)):
            Circle(F0_R_3)
    extrude(amount=F3_DEPTH)

    # F4: F3 across face


with BuildPart() as f3_1:
    add(f3.part, clean=False)
    with SkipClean():  # cleaning this boolean's faces spoils the solid; the shape is the same uncleaned
        add(f3.part.mirror(Plane(origin=(0, 15.9453681803, 27.75), x_dir=(0, 1, 0), z_dir=(1, 0, 0))), clean=False)

    # F5#2
    f5_2_edges = [f3_1.edges().sort_by_distance(p)[0] for p in [
        (0, -25.5, 27.75),
    ]]
    fillet(f5_2_edges, radius=F5_2_R)

    # F6#2
    f6_2_edges = [f3_1.edges().sort_by_distance(p)[0] for p in [
        (0, 49.381336, 27.75),
    ]]
    fillet(f6_2_edges, radius=F6_2_R)


solid = Compound([f1_1.part, f3_1.part])
